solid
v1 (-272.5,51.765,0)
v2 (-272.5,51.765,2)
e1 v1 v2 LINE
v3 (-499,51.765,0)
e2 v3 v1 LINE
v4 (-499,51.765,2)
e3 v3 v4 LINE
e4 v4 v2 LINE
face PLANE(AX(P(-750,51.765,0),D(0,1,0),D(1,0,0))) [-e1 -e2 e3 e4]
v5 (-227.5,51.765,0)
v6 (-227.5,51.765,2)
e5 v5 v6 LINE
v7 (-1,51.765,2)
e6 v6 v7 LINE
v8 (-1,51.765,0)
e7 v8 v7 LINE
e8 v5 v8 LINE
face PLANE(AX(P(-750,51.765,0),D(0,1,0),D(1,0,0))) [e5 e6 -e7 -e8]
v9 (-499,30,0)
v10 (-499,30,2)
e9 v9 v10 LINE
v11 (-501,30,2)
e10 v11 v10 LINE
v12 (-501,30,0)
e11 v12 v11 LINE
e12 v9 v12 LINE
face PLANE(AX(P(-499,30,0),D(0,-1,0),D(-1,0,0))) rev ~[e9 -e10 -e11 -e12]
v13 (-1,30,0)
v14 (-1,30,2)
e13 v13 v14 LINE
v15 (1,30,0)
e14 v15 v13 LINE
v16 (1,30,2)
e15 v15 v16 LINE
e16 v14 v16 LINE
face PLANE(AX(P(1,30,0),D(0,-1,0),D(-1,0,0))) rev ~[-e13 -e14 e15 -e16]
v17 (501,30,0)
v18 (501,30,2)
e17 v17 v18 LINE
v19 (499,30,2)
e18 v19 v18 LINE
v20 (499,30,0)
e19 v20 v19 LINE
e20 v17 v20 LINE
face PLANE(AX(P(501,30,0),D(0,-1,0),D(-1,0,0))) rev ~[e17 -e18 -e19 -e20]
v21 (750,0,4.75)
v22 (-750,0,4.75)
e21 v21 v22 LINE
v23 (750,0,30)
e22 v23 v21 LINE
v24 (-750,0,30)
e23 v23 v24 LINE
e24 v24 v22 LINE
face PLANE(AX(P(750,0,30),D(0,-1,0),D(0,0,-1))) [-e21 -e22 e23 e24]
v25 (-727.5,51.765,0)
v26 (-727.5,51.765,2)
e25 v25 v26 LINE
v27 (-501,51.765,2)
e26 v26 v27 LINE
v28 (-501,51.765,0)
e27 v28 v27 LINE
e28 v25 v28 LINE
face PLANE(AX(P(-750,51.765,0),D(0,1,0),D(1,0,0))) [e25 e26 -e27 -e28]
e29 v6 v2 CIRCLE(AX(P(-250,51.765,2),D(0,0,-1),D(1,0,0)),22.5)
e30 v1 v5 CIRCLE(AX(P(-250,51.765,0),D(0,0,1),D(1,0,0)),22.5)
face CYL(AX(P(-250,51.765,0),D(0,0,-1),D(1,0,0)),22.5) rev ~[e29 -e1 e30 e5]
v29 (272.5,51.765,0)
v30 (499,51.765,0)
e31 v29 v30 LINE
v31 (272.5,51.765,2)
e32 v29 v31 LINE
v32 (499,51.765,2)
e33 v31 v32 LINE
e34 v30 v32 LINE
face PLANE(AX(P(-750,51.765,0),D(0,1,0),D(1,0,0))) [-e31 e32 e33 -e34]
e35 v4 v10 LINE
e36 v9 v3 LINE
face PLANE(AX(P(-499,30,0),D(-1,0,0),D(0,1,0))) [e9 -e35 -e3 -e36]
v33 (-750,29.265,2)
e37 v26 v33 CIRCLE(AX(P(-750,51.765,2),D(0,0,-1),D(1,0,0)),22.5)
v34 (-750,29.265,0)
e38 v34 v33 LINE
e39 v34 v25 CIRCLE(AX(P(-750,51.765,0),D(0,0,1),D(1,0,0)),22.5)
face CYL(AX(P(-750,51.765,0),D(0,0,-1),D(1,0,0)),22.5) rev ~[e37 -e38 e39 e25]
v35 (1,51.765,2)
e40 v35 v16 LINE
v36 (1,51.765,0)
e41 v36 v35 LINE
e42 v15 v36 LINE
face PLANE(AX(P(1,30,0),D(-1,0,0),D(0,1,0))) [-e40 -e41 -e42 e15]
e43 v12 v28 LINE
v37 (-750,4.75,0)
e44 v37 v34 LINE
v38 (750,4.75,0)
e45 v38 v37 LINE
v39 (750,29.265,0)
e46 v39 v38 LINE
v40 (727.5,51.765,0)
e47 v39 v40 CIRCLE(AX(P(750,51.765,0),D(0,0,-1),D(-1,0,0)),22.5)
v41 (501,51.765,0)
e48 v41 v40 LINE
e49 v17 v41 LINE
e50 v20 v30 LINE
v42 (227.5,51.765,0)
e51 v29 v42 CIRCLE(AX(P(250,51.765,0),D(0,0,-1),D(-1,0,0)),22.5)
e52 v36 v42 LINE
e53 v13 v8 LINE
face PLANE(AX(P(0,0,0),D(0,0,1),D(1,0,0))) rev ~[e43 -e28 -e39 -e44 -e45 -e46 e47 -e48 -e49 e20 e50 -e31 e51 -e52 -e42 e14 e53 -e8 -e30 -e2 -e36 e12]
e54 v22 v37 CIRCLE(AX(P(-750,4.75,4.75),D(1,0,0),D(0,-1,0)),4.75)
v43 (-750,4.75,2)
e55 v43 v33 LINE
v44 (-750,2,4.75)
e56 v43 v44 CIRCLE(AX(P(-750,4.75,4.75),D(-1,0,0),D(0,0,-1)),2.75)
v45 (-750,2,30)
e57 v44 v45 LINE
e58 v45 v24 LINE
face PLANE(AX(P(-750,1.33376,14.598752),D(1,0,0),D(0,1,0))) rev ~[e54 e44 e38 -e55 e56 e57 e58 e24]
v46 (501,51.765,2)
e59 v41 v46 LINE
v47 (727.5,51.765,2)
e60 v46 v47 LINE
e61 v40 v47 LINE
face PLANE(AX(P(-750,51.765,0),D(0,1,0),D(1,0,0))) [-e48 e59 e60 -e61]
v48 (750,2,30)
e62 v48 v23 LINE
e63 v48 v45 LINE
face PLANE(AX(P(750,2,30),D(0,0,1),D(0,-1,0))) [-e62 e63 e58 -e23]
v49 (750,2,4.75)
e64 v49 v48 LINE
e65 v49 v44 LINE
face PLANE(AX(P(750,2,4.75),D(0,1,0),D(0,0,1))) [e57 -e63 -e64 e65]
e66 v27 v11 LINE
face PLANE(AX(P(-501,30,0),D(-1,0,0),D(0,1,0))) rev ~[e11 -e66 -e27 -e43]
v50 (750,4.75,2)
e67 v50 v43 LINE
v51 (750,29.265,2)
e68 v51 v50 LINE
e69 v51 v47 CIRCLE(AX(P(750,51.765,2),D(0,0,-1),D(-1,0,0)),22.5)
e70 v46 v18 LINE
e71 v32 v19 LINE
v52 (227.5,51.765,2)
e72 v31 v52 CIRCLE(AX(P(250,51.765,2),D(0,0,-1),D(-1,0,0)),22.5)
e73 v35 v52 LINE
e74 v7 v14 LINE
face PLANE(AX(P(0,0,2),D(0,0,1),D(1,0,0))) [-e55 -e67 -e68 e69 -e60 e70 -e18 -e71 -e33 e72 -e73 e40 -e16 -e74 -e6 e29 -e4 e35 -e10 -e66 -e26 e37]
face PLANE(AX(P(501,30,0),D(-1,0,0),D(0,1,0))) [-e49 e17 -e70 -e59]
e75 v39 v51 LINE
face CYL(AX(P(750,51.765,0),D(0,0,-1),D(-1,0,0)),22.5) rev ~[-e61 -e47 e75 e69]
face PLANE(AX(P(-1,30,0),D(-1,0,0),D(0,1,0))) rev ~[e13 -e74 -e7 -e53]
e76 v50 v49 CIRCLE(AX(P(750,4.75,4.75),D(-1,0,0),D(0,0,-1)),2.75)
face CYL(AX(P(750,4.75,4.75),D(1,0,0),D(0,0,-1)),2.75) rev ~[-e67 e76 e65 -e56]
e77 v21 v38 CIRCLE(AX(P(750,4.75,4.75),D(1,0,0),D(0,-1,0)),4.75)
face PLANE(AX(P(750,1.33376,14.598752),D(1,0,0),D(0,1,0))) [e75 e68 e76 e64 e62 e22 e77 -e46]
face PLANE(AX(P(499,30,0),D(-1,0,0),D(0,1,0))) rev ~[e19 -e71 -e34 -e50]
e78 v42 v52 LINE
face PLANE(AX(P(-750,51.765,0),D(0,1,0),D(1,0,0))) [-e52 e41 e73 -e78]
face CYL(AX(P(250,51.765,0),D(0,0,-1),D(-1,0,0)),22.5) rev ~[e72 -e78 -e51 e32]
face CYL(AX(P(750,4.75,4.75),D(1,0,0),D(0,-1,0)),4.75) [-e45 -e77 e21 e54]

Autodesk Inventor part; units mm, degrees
ref_plane "YZ Plane" through (0, 0, 0) normal (1, 0, 0) x (0, 1, 0)
ref_plane "XZ Plane" through (0, 0, 0) normal (0, 1, 0) x (-1, 0, 0)
ref_plane "XY Plane" through (0, 0, 0) normal (0, 0, 1) x (1, 0, 0)
sketch "Sketch1" plane through (0, 0, 0) normal (0, 0, 1) x (1, 0, 0)
  line L0 (-750, 51.765) -> (750, 51.765)
  line L1 (750, 51.765) -> (750, 0)
  line L2 (750, 0) -> (-750, 0)
  line L3 (-750, 0) -> (-750, 51.765)
  point P0 (0, 0)
  point P1 (0, 0)
  dimension "d0" = 1500
  dimension "d1" = 51.765
extrude "Plate1" add sketch "Sketch1" along normal blind 2
sketch "Sketch2" plane through (750, 2, 0) normal (0, -1, 0) x (1, 0, 0)
  line L0 (-1500, 0) -> (0, 0)
  line L1 (0, 0) -> (0, 30)
  line L2 (0, 30) -> (-1500, 30)
  line L3 (-1500, 30) -> (-1500, 0)
edge flange "Flange1" height 30 angle 90 thickness 2 bend radius 2.75 thickness toward (0, -1, 0) relief round relief width 2 relief depth 1 edges at (0, 0, 2) wall of the first edge with corners at (-750, 2, 0) (750, 2, 0) (750, 2, 30) (-750, 2, 30)
bend "Bend1"
corner "Corner1"
sketch "Sketch5" plane through (0, 0, 0) normal (0, 0, -1) x (-1, 0, 0)
  line L0 (750, 51.765) -> (-750, 51.765) projected
  line L1 (-1, 30) -> (-1, 51.765)
  line L2 (750, 0) -> (-750, 0) projected
  line L3 (-1, 30) -> (1, 30)
  line L4 (1, 30) -> (1, 51.765)
  point P0 (0, 0)
  point P1 (0, 30)
  point P2 (0, 0)
  dimension "d27" = 2
  dimension "d29" = 30
extrude "Extrusion1" cut sketch "Sketch5" against normal through all
pattern_linear "Rectangular Pattern1" count 3 spacing 500 along (1, 0, 0) of "Extrusion1" first direction both ways yes
sketch "Sketch6" plane through (0, 0, 0) normal (0, 0, -1) x (-1, 0, 0)
  line L0 (-750, 51.765) -> (-750, 4.75) projected
  circle A0 centre (-750, 51.765) radius 22.5
  line L1 (-750, 51.765) -> (750, 51.765) projected
  line L2 (-499, 30) -> (-501, 30) construction
  line L3 (-499, 30) -> (-1, 30) construction
  line L4 (-1, 30) -> (-1, 51.765) construction
  line L5 (-1, 51.765) -> (-499, 51.765) projected
  circle A1 centre (-250, 51.765) radius 22.5
  point P0 (0, 0)
  point P1 (-727.5, 51.765)
  point P2 (-750, 29.265)
  point P3 (-250, 30)
  point P4 (-227.5, 51.765)
  point P5 (-272.5, 51.765)
  dimension "d24" = 45
extrude "Extrusion2" cut sketch "Sketch6" against normal through all contours L1 A0 L0 | L1 A1 picked at (-748.3311, 36.953) picked at (-248.2369, 40.8343)
mirror "Mirror1" about plane through (0, 0, 0) normal (1, 0, 0) of "Extrusion2"
sketch "Sketch7" plane through (0, 0, 2) normal (0, 0, 1) x (1, 0, 0)
  arc A0 (-750, 29.265) -> (-727.5, 51.765) centre (-750, 51.765) ccw projected
  line L0 (-750, 4.75) -> (-750, 29.265) projected
  line L1 (-750, 4.75) -> (750, 4.75) projected
  line L2 (750, 29.265) -> (750, 4.75) projected
  arc A1 (727.5, 51.765) -> (750, 29.265) centre (750, 51.765) ccw projected
  line L3 (501, 51.765) -> (727.5, 51.765) projected
  line L4 (501, 51.765) -> (501, 30) projected
  line L5 (501, 30) -> (499, 30) projected
  line L6 (499, 30) -> (499, 51.765) projected
  line L7 (1, 51.765) -> (227.5, 51.765) projected
  line L8 (1, 51.765) -> (1, 30) projected
  line L9 (1, 30) -> (-1, 30) projected
  line L10 (-1, 30) -> (-1, 51.765) projected
  line L11 (-499, 51.765) -> (-272.5, 51.765) projected
  line L12 (-499, 51.765) -> (-499, 30) projected
  line L13 (-499, 30) -> (-501, 30) projected
  line L14 (-501, 30) -> (-501, 51.765) projected
  line L15 (-727.5, 51.765) -> (-501, 51.765) projected
  line L16 (649, 50.765) -> (651, 50.765)
  line L17 (651, 50.765) -> (651, 51.765)
  line L18 (651, 51.765) -> (649, 51.765)
  line L19 (649, 51.765) -> (649, 50.765)
  line L20 (650, 4.75) -> (650, 51.765) construction
  line L21 (272.5, 51.765) -> (499, 51.765) projected
  arc A2 (227.5, 51.765) -> (272.5, 51.765) centre (250, 51.765) ccw projected
  line L22 (-227.5, 51.765) -> (-1, 51.765) projected
  arc A3 (-272.5, 51.765) -> (-227.5, 51.765) centre (-250, 51.765) ccw projected
  point P0 (0, 0)
  point P1 (650, 50.765)
  point P2 (649, 51.265)
  point P3 (650, 28.2575)
  dimension "d30" = 2
  dimension "d31" = 1
  dimension "d33" = 100
extrude "Extrusion3" [suppressed]
mirror "Mirror2" [suppressed]
sketch "Sketch9" plane through (0, 0, 2) normal (0, 0, 1) x (1, 0, 0)
  line L0 (494, 46.765) -> (494, 34.765) construction
  line L1 (494, 34.765) -> (294, 34.765) construction
  line L2 (294, 34.765) -> (294, 46.765) construction
  line L3 (294, 46.765) -> (494, 46.765) construction
  line L4 (499, 30) -> (499, 51.765) projected
  line L5 (1, 51.765) -> (499, 51.765) projected
  point P0 (0, 0)
  dimension "d38" = 200
  dimension "d39" = 12
  dimension "d42" = 5
  dimension "d43" = 5
mark "Mark3"
equation "\"d1\" = Стрингер_1"
equation "\"d27\" = d18"
equation "\"d29\" = Стрингер_глубина_паза"
equation "\"d43\" = d42"
equation "\"d2\" = Thickness"
equation "\"d3\" = BendReliefWidth"
equation "\"d4\" = BendReliefDepth"
equation "\"d5\" = MinimumRemnant"
equation "\"d6\" = TransitionRadius"
equation "\"d9\" = BendRadius"
equation "\"d10\" = CornerReliefSize"
equation "\"d11\" = GapSize"
equation "\"d12\" = JacobiRadiusSize"
equation "\"BendReliefWidth\" = Thickness"
equation "\"BendReliefDepth\" = 0.5 * Thickness"
equation "\"CornerReliefSize\" = 4 * Thickness"
equation "\"MinimumRemnant\" = 2 * Thickness"
equation "\"TransitionRadius\" = BendRadius"
equation "\"JacobiRadiusSize\" = BendRadius"
equation "\"GapSize\" = Thickness"
equation "\"d18\" = Thickness"
equation "\"qqqqqq\" = 67.35706"
equation "\"Стрингер_1\" = 51.765032"
equation "\"Стрингер_глубина_паза\" = 30"
equation "\"Thickness\" = 2"
equation "\"BendRadius\" = 2.75"
properties part number "MSC 051 stringer back ^" material "Stainless Steel"
